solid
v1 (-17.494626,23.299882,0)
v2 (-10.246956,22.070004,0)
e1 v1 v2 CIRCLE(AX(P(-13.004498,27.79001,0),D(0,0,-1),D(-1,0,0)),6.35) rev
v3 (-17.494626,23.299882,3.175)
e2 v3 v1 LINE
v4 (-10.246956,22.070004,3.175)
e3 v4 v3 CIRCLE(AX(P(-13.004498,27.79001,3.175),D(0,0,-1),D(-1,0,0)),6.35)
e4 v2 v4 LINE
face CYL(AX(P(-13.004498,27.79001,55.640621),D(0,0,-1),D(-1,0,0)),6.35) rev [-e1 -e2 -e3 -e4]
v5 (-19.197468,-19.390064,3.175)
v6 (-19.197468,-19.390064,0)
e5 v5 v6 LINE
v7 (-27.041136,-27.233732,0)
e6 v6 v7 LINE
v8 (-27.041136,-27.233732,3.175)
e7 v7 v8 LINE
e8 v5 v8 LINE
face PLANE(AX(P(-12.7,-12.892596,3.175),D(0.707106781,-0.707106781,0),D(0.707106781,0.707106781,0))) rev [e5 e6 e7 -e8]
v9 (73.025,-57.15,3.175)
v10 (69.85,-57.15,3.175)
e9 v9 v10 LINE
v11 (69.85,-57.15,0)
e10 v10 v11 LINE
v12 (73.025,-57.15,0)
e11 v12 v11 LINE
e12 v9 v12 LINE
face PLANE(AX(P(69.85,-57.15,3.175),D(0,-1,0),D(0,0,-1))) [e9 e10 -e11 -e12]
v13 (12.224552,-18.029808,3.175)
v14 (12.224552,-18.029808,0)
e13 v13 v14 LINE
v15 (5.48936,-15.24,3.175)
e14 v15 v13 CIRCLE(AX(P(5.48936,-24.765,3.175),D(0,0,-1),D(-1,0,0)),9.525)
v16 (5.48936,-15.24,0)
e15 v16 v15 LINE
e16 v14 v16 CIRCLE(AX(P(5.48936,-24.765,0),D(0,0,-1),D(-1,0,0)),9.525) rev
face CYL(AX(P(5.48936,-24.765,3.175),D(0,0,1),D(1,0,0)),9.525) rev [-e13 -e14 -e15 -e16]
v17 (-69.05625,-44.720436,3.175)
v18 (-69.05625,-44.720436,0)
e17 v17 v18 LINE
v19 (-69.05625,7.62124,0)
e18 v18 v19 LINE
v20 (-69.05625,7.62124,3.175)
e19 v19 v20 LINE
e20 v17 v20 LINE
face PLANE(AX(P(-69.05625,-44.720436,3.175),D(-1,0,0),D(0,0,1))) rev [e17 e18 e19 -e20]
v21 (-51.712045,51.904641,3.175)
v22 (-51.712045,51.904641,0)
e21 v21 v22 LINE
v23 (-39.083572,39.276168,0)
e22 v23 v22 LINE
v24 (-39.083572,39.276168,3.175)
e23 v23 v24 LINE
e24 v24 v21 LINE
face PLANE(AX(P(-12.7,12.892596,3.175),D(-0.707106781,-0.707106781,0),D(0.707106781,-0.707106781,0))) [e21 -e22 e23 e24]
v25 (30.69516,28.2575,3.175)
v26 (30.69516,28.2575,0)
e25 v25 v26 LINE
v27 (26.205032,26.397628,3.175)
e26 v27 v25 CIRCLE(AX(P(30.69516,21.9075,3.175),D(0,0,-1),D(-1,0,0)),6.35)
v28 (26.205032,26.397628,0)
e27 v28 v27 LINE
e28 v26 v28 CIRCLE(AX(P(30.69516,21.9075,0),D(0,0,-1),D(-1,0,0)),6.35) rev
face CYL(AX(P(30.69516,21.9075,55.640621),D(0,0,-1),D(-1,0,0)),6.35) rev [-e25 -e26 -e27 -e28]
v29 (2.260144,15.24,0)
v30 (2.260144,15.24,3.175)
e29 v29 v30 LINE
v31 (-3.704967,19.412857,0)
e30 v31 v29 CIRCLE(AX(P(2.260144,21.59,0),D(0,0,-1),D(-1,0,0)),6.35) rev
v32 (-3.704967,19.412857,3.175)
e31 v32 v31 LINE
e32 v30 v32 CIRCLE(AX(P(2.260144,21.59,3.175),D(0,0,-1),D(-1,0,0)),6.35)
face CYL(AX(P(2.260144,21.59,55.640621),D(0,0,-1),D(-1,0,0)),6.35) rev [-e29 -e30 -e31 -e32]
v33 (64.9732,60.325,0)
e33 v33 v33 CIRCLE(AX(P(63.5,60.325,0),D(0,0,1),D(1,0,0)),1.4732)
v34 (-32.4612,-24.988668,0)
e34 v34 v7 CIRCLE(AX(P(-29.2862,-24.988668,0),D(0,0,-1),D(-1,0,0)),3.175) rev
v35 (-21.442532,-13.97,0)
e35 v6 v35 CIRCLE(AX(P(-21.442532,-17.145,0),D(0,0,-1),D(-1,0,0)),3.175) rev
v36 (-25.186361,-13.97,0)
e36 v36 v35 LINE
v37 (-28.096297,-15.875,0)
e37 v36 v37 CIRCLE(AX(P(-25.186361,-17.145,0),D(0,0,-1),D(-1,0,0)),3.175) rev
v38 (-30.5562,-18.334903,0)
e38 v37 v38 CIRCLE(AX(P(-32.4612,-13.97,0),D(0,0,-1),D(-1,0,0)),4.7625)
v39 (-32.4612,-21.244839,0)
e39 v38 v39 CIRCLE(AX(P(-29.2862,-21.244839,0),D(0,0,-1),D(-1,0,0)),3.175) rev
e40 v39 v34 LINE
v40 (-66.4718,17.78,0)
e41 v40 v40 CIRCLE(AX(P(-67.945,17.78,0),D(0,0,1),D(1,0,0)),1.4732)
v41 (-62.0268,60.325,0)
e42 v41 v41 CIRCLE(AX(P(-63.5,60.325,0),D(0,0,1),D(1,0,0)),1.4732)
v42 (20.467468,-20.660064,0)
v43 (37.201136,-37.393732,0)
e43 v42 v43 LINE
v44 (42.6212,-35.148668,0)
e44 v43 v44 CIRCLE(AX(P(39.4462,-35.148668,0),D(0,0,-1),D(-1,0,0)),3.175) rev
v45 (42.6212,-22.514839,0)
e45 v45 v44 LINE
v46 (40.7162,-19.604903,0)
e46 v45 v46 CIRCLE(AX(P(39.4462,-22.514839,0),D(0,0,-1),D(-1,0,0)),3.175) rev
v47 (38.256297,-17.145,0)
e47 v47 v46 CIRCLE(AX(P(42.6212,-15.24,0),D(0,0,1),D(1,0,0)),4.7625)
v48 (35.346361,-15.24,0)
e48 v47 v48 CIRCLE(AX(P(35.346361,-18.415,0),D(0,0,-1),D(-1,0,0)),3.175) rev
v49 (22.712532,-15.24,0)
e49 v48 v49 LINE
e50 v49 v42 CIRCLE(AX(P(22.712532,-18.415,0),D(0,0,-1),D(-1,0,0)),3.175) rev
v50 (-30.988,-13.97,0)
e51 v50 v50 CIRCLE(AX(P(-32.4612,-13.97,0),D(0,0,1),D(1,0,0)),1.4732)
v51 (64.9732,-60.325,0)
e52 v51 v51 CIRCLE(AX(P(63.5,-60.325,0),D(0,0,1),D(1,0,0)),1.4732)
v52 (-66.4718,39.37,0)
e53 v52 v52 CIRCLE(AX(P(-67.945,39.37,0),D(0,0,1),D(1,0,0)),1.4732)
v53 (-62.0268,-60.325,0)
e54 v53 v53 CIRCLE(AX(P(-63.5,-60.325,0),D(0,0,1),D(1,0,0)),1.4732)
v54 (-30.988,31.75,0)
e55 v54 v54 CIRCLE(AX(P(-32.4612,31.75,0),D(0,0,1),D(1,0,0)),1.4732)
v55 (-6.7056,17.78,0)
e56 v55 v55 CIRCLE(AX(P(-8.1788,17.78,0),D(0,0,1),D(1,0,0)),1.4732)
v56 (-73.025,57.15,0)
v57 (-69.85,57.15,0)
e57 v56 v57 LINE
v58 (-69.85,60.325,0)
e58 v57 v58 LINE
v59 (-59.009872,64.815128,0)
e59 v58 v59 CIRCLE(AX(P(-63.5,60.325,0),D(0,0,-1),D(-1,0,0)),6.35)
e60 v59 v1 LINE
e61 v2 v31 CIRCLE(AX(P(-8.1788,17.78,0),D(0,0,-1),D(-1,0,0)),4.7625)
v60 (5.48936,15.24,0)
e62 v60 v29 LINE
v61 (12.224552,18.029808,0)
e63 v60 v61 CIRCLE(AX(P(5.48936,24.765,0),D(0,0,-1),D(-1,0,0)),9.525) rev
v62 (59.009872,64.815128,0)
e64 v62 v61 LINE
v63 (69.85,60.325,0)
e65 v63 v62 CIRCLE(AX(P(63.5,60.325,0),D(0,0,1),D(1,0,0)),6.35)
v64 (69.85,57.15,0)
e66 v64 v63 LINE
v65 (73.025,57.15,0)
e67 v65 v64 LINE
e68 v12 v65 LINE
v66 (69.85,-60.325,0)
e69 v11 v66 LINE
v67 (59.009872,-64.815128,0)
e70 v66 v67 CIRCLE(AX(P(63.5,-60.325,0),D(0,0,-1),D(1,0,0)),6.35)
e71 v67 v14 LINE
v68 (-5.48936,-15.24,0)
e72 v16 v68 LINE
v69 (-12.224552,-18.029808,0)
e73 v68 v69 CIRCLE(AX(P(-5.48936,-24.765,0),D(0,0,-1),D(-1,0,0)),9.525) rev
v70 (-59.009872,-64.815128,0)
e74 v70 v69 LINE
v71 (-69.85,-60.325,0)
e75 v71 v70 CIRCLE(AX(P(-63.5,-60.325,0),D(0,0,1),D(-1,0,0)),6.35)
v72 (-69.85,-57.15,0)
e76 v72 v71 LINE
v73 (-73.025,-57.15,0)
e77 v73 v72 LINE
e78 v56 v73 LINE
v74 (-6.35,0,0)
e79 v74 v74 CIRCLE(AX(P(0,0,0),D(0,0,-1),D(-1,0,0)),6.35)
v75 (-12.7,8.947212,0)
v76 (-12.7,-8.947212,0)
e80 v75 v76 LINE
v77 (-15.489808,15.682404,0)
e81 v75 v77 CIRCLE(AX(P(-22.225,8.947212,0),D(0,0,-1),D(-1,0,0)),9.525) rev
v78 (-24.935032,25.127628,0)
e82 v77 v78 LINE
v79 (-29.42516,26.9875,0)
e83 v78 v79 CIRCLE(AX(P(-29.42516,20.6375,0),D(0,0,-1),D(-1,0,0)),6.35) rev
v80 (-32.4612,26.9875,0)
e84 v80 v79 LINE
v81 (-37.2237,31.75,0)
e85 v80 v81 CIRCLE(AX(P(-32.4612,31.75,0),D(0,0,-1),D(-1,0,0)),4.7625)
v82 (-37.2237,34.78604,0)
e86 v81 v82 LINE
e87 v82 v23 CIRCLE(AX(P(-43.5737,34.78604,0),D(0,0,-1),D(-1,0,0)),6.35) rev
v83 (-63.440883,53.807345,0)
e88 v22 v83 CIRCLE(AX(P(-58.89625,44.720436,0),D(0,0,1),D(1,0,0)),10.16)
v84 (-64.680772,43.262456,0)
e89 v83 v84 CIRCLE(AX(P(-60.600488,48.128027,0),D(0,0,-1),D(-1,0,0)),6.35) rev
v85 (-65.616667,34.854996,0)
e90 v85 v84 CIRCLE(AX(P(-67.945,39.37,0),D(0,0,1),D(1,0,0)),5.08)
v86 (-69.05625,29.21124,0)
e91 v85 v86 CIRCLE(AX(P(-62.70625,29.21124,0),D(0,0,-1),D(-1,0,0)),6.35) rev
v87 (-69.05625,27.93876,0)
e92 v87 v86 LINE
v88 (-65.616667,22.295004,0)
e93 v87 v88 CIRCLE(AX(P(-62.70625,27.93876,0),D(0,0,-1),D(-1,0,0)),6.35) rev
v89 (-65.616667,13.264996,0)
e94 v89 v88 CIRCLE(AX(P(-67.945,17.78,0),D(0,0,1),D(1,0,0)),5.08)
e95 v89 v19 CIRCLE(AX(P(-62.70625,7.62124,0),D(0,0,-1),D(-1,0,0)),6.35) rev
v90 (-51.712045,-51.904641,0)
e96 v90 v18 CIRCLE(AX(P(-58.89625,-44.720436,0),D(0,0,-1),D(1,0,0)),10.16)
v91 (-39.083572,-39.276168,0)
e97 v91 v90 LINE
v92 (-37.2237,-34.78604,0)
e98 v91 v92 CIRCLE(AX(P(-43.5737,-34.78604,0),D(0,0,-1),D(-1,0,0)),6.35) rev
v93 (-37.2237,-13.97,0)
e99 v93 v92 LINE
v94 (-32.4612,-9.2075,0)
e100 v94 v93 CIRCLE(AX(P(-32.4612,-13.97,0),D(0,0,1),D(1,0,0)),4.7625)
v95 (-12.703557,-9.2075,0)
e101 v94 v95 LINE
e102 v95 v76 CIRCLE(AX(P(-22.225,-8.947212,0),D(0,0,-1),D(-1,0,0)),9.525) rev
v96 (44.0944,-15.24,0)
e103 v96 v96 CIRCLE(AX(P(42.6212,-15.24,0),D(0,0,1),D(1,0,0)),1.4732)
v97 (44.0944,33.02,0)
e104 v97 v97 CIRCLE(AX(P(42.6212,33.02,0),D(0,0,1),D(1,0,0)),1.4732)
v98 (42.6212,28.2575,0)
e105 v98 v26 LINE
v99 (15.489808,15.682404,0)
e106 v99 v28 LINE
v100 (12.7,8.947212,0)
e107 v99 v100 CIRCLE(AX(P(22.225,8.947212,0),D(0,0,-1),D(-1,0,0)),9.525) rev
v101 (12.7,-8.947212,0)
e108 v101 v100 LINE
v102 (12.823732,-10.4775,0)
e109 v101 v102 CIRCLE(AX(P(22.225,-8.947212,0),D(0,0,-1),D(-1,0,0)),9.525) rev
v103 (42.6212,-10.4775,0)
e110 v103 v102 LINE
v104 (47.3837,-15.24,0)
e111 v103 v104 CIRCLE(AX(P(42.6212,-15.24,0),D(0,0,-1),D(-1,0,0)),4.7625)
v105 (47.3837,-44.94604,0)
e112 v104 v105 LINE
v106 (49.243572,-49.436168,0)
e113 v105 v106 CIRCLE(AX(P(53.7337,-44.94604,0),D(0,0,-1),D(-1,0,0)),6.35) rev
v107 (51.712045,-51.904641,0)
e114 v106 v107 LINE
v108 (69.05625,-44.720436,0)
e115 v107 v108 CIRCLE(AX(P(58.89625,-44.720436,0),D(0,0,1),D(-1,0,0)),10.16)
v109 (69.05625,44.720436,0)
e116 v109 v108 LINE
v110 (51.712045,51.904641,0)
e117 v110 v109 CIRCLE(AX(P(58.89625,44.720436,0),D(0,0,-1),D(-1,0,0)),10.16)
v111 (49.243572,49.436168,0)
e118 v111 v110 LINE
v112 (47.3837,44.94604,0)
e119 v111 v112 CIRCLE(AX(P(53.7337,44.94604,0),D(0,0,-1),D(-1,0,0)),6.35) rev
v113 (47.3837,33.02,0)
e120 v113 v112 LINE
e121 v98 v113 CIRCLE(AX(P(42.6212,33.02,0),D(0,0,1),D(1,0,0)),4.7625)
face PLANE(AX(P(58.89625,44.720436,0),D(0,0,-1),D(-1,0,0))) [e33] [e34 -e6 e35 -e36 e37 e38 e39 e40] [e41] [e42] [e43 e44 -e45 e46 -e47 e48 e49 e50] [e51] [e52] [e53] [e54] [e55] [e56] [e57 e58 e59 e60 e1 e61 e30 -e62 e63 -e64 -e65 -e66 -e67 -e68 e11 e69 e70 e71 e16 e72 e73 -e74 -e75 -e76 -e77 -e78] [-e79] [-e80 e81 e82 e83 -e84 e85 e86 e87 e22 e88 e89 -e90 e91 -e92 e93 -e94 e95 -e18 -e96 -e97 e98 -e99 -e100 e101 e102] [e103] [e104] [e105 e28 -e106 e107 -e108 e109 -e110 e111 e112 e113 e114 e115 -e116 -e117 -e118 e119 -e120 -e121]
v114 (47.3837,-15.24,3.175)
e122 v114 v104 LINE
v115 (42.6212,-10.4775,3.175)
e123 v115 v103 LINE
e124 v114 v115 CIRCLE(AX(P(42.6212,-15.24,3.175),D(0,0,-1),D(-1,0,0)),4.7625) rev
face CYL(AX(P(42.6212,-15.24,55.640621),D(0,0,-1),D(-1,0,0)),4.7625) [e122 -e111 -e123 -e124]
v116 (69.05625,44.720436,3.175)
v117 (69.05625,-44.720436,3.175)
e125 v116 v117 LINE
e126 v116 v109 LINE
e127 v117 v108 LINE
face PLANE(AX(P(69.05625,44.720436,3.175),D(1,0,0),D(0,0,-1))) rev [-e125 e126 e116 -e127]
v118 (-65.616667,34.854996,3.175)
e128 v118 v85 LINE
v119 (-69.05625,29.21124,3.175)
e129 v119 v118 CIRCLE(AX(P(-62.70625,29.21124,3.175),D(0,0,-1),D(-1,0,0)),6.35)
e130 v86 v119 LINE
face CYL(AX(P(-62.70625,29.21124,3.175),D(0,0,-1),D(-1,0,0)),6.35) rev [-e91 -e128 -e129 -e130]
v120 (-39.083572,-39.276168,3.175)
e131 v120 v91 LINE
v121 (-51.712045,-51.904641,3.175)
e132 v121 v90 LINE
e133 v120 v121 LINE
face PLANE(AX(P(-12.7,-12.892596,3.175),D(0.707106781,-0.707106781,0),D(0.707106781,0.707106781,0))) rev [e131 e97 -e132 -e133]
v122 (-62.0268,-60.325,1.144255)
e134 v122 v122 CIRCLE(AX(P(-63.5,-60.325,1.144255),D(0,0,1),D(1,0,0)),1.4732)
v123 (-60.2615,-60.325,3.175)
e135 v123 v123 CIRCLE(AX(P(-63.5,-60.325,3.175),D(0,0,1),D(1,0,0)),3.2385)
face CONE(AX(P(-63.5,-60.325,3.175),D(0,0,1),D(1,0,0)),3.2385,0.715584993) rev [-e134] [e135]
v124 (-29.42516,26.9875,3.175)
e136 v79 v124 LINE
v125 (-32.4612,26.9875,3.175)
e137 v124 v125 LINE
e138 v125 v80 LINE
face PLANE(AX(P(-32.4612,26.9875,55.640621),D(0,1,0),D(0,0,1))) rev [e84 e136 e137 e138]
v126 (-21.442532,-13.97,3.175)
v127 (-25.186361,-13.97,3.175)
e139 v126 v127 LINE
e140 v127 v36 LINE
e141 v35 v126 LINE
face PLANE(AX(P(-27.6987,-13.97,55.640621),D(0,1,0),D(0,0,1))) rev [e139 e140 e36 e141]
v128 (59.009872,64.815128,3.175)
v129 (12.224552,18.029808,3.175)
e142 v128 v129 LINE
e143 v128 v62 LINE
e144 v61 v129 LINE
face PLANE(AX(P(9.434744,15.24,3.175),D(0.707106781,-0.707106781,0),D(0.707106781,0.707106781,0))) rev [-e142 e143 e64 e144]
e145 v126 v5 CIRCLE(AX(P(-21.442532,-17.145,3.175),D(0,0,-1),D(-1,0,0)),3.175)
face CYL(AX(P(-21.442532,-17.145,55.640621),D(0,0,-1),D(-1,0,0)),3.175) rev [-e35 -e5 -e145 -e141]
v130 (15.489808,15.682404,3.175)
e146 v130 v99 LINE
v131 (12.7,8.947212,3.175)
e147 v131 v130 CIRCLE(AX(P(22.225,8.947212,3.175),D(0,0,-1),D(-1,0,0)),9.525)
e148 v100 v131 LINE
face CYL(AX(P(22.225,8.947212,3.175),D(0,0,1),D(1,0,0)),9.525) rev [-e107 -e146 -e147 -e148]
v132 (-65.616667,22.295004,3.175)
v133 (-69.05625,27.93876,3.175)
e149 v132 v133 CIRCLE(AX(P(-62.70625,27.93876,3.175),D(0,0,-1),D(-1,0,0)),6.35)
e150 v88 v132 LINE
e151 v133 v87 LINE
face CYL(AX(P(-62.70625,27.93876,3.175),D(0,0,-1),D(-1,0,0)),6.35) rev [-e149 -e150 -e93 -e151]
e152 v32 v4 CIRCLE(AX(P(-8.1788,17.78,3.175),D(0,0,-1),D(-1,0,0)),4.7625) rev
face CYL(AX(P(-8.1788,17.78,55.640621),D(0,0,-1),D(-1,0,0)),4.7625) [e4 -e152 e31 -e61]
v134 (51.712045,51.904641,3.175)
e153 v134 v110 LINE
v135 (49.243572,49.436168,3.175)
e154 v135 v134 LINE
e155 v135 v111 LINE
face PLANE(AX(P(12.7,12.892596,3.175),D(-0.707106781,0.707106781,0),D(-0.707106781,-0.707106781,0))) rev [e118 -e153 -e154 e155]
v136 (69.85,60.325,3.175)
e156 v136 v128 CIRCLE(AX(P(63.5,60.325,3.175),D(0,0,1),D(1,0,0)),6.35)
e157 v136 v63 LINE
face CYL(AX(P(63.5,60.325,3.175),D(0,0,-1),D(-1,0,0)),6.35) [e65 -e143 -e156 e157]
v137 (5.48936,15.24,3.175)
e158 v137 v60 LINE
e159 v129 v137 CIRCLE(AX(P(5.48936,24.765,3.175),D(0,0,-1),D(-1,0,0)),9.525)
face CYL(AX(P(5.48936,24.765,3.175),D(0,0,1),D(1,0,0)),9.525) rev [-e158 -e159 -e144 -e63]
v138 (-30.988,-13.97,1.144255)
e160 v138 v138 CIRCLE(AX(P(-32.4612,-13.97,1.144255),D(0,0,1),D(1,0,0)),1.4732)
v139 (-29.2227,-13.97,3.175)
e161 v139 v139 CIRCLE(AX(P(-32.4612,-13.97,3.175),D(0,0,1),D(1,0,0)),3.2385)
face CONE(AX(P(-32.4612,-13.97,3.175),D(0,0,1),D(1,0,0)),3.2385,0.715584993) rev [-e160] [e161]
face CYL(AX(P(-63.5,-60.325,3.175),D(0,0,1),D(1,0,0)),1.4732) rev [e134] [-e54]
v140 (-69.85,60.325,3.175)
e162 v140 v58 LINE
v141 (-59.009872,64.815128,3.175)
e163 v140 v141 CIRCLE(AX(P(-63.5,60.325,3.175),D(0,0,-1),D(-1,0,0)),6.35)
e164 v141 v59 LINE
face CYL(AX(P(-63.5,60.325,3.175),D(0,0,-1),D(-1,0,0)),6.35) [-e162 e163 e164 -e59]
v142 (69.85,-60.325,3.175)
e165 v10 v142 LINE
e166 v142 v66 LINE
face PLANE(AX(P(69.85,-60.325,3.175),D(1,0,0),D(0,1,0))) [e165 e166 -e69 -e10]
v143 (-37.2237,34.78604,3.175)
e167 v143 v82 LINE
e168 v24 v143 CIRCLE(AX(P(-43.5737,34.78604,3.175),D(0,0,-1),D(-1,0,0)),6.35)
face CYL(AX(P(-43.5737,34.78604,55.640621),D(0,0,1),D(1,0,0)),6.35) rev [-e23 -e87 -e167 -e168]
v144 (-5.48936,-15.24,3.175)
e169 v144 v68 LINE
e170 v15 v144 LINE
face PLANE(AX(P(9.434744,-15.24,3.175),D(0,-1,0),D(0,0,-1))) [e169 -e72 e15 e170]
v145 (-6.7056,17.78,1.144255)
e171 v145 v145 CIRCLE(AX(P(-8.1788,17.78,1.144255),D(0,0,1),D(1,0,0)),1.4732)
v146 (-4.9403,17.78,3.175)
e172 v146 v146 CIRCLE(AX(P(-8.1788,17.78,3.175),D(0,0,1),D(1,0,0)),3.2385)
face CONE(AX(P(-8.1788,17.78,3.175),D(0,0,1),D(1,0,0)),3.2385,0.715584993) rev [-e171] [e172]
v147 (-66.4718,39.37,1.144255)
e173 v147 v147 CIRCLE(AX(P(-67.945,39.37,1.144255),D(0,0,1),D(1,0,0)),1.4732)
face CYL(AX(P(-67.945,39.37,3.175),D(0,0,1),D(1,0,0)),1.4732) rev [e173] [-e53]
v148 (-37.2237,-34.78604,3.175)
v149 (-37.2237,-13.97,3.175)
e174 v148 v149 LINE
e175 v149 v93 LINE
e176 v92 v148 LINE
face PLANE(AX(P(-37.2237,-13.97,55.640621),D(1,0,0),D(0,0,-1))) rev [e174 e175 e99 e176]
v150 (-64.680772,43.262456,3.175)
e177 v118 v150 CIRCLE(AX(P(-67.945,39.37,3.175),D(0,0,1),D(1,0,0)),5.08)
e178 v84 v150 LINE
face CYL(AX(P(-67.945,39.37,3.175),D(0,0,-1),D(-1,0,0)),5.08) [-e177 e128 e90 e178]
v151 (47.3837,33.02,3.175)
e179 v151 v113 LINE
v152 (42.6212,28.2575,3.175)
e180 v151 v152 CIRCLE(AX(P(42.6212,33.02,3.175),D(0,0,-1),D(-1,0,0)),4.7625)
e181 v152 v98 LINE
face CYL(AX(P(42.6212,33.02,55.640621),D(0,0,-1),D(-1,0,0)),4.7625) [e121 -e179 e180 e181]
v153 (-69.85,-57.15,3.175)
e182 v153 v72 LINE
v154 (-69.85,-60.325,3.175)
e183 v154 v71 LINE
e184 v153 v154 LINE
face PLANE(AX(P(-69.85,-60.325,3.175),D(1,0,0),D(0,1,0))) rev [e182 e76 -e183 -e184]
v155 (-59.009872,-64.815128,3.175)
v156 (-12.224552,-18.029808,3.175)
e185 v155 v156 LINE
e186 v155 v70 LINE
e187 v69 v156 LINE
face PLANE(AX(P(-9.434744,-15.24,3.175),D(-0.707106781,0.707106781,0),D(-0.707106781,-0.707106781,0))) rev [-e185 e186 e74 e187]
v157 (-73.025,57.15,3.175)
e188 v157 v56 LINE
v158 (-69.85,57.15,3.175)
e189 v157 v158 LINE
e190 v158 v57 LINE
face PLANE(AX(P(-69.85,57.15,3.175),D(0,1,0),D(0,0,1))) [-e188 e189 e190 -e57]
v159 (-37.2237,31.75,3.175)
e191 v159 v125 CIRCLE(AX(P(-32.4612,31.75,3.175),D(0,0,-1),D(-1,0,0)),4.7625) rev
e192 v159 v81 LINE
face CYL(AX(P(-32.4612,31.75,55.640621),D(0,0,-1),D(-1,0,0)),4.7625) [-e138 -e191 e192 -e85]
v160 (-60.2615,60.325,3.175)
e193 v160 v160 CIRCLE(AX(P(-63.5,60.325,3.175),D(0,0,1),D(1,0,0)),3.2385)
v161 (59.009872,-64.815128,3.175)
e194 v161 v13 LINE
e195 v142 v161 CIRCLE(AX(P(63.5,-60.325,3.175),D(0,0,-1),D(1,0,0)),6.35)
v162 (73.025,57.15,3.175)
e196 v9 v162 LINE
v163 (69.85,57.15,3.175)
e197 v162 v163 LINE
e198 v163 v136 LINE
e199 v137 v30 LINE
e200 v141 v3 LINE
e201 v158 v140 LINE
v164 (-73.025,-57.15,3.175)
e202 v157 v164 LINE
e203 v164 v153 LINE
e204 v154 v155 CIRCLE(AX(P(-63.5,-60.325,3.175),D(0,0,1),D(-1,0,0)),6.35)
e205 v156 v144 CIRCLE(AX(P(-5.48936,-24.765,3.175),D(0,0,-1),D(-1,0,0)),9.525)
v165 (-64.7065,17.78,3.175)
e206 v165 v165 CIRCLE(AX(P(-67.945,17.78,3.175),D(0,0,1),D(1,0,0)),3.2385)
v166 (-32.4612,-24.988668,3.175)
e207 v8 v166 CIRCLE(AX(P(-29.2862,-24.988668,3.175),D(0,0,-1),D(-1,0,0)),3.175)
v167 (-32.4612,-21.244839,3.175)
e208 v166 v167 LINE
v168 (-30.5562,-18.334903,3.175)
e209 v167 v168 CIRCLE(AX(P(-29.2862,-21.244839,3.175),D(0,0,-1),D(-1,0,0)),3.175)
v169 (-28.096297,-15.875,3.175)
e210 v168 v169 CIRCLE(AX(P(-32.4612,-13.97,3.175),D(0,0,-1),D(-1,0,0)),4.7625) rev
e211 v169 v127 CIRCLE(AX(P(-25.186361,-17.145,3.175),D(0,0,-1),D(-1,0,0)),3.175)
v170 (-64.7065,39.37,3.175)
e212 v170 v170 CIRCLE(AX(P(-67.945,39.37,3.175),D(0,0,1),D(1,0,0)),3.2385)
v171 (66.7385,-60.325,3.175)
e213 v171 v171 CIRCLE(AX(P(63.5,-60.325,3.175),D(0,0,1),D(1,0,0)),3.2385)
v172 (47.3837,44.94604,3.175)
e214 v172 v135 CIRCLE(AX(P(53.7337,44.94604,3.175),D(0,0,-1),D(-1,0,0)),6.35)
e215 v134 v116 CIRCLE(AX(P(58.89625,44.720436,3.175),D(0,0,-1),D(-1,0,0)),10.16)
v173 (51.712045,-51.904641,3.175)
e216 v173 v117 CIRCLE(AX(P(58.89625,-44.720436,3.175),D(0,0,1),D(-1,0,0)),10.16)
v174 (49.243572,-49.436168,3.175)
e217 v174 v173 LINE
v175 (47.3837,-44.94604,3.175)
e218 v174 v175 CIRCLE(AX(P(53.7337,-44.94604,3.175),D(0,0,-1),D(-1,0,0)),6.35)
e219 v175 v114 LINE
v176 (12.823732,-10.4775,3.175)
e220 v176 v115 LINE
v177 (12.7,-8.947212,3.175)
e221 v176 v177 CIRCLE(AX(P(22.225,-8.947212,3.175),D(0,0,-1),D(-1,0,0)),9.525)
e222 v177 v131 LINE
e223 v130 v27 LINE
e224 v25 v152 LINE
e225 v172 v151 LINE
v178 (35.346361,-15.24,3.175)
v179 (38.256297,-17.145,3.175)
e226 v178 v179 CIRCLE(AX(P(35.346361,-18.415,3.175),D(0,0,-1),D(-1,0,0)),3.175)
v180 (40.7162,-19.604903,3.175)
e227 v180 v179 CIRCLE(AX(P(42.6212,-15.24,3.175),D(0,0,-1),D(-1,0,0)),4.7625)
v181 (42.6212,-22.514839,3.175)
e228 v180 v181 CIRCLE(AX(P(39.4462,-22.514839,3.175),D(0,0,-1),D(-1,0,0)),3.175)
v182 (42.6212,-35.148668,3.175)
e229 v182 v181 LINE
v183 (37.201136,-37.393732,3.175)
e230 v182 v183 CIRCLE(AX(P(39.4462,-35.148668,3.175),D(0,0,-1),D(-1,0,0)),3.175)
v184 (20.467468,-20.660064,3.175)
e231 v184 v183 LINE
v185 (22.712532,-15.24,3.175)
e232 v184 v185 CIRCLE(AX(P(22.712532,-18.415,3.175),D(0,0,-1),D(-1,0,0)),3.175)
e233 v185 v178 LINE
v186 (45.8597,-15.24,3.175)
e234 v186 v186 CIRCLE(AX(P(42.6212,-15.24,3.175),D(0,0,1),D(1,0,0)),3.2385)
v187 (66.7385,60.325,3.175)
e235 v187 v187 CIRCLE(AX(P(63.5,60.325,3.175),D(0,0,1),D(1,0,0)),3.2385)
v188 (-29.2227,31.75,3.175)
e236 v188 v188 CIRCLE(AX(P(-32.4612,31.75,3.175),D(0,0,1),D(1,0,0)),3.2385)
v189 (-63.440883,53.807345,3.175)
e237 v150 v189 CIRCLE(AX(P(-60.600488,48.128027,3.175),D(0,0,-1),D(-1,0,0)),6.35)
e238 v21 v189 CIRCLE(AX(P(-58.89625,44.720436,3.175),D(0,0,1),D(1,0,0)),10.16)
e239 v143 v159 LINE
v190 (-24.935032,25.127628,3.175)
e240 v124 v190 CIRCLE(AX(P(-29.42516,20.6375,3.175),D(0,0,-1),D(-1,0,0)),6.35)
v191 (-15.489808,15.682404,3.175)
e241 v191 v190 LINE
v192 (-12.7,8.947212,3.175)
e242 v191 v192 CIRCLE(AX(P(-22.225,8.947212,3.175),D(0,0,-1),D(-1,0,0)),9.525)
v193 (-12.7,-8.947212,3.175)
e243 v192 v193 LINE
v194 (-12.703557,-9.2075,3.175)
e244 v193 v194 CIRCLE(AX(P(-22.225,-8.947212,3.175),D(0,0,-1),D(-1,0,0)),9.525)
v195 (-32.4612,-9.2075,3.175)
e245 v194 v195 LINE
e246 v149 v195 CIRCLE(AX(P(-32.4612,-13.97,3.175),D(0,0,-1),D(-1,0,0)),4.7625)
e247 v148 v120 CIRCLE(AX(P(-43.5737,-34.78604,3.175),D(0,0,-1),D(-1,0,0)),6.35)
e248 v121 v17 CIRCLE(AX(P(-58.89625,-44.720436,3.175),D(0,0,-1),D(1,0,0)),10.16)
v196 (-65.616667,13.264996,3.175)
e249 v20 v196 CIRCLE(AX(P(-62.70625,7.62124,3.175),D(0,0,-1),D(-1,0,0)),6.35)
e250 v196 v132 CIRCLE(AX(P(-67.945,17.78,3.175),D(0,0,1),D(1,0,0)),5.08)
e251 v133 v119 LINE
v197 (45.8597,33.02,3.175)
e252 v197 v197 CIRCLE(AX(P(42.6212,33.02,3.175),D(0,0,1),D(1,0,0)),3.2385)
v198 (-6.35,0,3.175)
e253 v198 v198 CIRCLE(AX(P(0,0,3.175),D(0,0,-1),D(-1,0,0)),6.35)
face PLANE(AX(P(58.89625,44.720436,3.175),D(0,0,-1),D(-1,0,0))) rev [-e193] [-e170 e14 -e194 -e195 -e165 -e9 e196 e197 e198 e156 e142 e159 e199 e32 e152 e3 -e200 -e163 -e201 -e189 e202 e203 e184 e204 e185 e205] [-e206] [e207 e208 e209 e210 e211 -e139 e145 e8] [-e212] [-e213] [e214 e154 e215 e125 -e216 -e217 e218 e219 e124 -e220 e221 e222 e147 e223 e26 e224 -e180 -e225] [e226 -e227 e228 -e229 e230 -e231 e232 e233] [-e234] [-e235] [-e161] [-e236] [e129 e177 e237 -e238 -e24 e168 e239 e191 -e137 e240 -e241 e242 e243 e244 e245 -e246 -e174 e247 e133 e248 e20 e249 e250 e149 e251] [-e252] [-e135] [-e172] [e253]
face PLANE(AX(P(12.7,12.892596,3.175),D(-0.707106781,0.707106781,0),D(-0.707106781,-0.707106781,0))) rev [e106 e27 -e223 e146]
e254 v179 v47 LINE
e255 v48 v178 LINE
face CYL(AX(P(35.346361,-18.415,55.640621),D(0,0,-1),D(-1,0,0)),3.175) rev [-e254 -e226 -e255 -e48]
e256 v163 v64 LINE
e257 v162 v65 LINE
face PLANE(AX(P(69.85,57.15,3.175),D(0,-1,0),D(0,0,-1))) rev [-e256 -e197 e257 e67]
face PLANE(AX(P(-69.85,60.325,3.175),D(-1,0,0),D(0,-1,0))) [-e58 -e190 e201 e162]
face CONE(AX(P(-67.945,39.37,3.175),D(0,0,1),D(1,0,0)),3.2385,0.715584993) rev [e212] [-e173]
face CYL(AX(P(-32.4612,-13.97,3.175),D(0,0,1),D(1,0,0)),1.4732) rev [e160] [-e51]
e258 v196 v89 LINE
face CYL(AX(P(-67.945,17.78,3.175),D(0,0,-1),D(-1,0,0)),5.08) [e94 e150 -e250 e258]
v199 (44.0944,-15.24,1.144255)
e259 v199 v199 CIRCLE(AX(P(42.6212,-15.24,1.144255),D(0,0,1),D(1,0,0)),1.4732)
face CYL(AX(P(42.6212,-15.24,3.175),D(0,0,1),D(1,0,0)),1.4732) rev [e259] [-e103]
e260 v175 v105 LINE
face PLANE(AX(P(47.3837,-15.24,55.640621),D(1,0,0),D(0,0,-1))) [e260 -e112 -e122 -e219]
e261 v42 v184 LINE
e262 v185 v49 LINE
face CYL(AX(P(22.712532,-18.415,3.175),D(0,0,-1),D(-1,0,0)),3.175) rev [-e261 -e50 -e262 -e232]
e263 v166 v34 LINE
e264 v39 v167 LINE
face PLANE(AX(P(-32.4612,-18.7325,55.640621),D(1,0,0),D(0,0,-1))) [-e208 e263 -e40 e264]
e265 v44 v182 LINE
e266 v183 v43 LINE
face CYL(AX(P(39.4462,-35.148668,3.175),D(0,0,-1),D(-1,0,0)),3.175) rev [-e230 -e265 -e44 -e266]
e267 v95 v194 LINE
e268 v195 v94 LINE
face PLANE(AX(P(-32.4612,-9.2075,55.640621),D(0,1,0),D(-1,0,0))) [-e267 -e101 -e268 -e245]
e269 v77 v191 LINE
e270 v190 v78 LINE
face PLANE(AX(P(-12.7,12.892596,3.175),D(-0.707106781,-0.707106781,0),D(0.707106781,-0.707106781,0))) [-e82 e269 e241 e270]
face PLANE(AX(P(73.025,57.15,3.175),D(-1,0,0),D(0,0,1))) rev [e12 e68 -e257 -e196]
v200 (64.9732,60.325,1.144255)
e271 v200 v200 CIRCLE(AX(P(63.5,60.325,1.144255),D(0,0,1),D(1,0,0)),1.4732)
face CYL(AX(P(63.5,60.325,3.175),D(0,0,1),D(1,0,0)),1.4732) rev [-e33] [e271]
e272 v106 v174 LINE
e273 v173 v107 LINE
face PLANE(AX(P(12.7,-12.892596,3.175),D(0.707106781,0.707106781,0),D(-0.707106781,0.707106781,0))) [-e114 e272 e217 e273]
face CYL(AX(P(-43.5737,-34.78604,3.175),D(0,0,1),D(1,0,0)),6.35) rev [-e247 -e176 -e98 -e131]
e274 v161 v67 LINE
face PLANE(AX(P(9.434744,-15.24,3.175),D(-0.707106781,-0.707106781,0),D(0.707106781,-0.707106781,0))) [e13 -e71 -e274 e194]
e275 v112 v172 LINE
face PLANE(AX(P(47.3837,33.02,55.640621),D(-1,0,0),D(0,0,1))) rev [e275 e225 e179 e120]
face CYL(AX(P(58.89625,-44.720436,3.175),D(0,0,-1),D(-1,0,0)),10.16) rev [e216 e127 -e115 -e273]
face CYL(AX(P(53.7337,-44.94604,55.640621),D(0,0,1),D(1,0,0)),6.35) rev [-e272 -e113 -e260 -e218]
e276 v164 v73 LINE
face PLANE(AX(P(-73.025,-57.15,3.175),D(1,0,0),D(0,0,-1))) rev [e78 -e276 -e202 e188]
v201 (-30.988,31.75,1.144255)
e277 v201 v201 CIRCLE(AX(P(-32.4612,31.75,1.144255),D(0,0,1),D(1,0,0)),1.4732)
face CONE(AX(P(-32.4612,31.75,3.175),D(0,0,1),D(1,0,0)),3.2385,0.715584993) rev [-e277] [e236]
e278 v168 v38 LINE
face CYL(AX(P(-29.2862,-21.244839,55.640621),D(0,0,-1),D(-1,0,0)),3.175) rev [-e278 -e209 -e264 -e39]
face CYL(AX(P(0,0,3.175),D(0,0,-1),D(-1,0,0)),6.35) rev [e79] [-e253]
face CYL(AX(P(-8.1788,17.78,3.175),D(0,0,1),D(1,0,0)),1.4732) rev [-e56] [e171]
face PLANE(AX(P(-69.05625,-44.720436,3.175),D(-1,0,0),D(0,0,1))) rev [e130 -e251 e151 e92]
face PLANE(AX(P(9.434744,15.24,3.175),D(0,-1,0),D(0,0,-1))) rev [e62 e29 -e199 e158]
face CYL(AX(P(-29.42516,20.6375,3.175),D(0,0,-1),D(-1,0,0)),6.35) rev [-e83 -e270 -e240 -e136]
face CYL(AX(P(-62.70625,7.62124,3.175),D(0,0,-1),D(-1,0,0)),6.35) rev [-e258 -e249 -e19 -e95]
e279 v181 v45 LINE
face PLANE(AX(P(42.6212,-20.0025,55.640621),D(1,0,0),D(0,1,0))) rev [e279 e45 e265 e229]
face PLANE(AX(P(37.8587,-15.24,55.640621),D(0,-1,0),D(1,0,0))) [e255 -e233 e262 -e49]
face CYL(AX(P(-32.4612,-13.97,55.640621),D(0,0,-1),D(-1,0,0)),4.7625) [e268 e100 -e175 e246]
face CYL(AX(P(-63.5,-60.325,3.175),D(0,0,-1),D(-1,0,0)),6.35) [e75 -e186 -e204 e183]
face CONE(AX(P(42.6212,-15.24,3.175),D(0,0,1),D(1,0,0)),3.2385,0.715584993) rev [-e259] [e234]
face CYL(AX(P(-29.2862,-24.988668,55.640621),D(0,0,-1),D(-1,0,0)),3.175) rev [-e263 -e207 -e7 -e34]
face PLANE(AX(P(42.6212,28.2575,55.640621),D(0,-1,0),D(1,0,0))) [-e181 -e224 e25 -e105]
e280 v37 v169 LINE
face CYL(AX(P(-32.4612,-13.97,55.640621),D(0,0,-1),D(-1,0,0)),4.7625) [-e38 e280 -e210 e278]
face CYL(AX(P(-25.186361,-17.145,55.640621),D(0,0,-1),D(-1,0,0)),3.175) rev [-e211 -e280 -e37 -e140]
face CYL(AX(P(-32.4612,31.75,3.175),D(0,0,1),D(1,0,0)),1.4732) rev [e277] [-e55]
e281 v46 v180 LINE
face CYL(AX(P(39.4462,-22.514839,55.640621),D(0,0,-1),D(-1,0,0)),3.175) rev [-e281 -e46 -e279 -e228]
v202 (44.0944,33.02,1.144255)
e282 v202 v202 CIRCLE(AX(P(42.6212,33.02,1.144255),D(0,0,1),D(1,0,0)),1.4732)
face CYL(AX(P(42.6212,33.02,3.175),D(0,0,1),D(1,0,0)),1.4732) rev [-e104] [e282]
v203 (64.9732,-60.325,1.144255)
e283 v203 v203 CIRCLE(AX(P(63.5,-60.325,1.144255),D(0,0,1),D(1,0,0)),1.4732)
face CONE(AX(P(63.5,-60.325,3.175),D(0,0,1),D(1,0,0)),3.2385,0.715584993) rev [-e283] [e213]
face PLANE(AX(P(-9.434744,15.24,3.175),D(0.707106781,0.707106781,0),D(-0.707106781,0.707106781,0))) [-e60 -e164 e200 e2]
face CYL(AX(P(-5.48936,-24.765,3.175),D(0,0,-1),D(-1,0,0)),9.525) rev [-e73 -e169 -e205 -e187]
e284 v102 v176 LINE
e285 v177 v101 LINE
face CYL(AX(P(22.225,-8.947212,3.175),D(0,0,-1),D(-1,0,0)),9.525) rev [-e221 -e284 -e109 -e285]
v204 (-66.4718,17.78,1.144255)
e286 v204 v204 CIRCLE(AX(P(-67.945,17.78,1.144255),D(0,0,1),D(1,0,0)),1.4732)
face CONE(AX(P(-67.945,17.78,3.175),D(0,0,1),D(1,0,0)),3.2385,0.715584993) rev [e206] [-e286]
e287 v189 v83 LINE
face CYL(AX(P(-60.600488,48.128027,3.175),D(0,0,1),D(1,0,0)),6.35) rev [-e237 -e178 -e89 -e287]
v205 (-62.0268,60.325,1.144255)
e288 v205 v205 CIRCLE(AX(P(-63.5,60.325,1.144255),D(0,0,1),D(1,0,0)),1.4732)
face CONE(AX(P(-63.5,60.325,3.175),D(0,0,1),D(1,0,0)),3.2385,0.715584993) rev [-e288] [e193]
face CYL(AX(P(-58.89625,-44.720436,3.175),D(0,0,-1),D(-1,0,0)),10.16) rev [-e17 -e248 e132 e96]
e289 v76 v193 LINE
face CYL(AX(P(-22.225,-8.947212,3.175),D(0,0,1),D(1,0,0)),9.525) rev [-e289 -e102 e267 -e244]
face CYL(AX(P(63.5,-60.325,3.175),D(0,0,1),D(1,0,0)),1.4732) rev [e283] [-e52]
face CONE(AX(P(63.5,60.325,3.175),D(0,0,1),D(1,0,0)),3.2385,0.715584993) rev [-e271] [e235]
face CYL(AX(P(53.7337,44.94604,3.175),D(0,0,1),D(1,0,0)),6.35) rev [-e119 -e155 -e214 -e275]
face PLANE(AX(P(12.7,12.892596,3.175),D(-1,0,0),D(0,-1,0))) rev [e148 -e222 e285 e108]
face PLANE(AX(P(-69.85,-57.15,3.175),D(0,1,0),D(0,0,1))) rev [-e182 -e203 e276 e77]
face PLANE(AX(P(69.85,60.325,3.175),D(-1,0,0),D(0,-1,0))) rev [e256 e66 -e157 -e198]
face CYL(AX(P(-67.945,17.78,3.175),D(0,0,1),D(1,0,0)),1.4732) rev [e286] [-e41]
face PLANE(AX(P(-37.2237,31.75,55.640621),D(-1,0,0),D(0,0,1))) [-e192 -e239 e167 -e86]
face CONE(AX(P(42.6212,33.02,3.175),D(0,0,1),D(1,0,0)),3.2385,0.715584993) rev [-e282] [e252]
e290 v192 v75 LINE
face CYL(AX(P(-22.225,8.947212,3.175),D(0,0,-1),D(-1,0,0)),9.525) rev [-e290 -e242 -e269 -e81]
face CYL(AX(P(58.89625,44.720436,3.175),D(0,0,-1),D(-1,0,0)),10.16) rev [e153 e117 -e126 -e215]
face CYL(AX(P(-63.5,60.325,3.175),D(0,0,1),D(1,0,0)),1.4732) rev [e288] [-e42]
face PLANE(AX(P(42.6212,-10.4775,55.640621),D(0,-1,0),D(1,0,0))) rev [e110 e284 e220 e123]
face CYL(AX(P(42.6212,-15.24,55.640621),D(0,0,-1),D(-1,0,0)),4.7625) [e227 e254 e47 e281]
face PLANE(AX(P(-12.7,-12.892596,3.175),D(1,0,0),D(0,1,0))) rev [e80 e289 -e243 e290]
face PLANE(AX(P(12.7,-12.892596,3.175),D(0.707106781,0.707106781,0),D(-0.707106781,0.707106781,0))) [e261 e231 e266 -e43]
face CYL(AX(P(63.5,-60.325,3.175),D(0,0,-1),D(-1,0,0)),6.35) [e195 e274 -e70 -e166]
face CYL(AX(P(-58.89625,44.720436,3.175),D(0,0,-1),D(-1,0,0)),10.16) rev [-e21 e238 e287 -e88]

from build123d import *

# Parameters (mm, degrees)
BOSS_EXTRUDE1_DEPTH           = 3.175
MIRROR2_COPY_1_DEPTH          = 3.175
INTERNAL_SHARPS_R             = 9.525
IMU_MOUNTING_DEPTH            = 3.175
IMU_MOUNTING_HOLES_AT_2_COUNT = 2
IMU_MOUNTING_HOLES_AT_2_PITCH = 21.59
IMU_TOOLING_RADIUS_R          = 6.35
SKETCH18_R                    = 4.7625
MCU_MOUNTING_RIBS_DEPTH       = 3.175
TOOLING_RADIUS_R              = 6.35
TOOLING_RADIUS_SMALL_R        = 3.175
SKETCH6_R                     = 6.35
MATERIAL_REMOVAL_DEPTH        = 99.935771608
MCU_MOUNTING_HOLES_AT_2_COUNT = 2
MCU_MOUNTING_HOLES_AT_2_PITCH = 45.72
MCU_MOUNTING_HOLES_AT_3_COUNT = 2
MCU_MOUNTING_HOLES_AT_3_PITCH = 88.57441442
MCU_MOUNTING_HOLES_AT_4_COUNT = 2
MCU_MOUNTING_HOLES_AT_4_PITCH = 75.093140098
MCU_MOUNTING_HOLES_AT_5_COUNT = 2
MCU_MOUNTING_HOLES_AT_5_PITCH = 39.97120776


with BuildPart() as part:
    # Sketch1 → Boss-Extrude1 (new body)
    with BuildSketch(Plane.XY):
        with BuildLine():
            Line((9.434743879, 15.24), (0, 15.24))
            Line((0, 15.24), (0, 0))
            Line((0, 0), (12.7, 0))
            Line((12.7, 0), (12.7, 12.892596045))
            Line((12.7, 12.892596045), (51.712045103, 51.904641149))
            ThreePointArc((51.712045103, 51.904641149), (62.784313673, 54.107052302), (69.05625, 44.720436252))
            Line((69.05625, 44.720436252), (69.05625, 0))
            Line((69.05625, 0), (73.025, 0))
            Line((73.025, 0), (73.025, 57.15))
            Line((73.025, 57.15), (69.85, 57.15))
            Line((69.85, 57.15), (69.85, 60.325))
            ThreePointArc((69.85, 60.325), (65.930039796, 66.191635031), (59.009871939, 64.815128061))
            Line((59.009871939, 64.815128061), (9.434743879, 15.24))
        make_face()
    boss_extrude1 = extrude(amount=BOSS_EXTRUDE1_DEPTH)

    # Sketch11 → CSK for #4 Flat Head Machine Screw1 (revolve, cut)
    with BuildSketch(Plane(origin=(63.5, 60.325, 3.175), x_dir=(0, -1, 0), z_dir=(1, 0, 0))):
        Polygon((0, 0), (0, 3.175), (1.4732, 3.175), (1.4732, 2.030745349), (3.2385, 0), align=None)
    csk_for_4_flat_head_machine_screw1 = revolve(axis=Axis((63.5, 60.325, 9.525), (0, 0, -1)), mode=Mode.SUBTRACT)

    # Mirror1: Boss-Extrude1, CSK for #4 Flat Head Machine Screw1 across plane
    add(boss_extrude1.mirror(Plane.ZX))
    add(csk_for_4_flat_head_machine_screw1.mirror(Plane.ZX), mode=Mode.SUBTRACT)

    # Mirror2: Boss-Extrude1, CSK for #4 Flat Head Machine Screw1 across plane
    add(boss_extrude1.mirror(Plane(origin=(0, 0, 0), x_dir=(0, 0, 1), z_dir=(1, 0, 0))))
    add(csk_for_4_flat_head_machine_screw1.mirror(Plane(origin=(0, 0, 0), x_dir=(0, 0, 1), z_dir=(1, 0, 0))), mode=Mode.SUBTRACT)

    # Mirror2 copy 1 sketch → Mirror2 copy 1 (add)
    with BuildSketch(Plane(origin=(0, 0, 0), x_dir=(-1, 0, 0), z_dir=(0, 0, 1))):
        with BuildLine():
            Line((9.434743879, 15.24), (0, 15.24))
            Line((0, 15.24), (0, 0))
            Line((0, 0), (12.7, 0))
            Line((12.7, 0), (12.7, 12.892596045))
            Line((12.7, 12.892596045), (51.712045103, 51.904641149))
            ThreePointArc((51.712045103, 51.904641149), (62.784313673, 54.107052302), (69.05625, 44.720436252))
            Line((69.05625, 44.720436252), (69.05625, 0))
            Line((69.05625, 0), (73.025, 0))
            Line((73.025, 0), (73.025, 57.15))
            Line((73.025, 57.15), (69.85, 57.15))
            Line((69.85, 57.15), (69.85, 60.325))
            ThreePointArc((69.85, 60.325), (65.930039796, 66.191635031), (59.009871939, 64.815128061))
            Line((59.009871939, 64.815128061), (9.434743879, 15.24))
        make_face()
    extrude(amount=MIRROR2_COPY_1_DEPTH)

    # Mirror2 copy 2 sketch → Mirror2 copy 2 (revolve, cut)
    with BuildSketch(Plane(origin=(-63.5, -60.325, 3.175), x_dir=(0, 1, 0), z_dir=(-1, 0, 0))):
        Polygon((0, 0), (0, 3.175), (1.4732, 3.175), (1.4732, 2.030745349), (3.2385, 0), align=None)
    revolve(axis=Axis((-63.5, -60.325, 9.525), (0, 0, -1)), mode=Mode.SUBTRACT)

    # INTERNAL-SHARPS
    internal_sharps_edges = [part.edges().sort_by_distance(p)[0] for p in [
        (-9.434743879, 15.24, 1.5875),
        (-12.7, 12.892596045, 1.5875),
        (9.434743879, 15.24, 1.5875),
        (12.7, 12.892596045, 1.5875),
        (9.434743879, -15.24, 1.5875),
        (12.7, -12.892596045, 1.5875),
        (-12.7, -12.892596045, 1.5875),
        (-9.434743879, -15.24, 1.5875),
    ]]
    fillet(internal_sharps_edges, radius=INTERNAL_SHARPS_R)

    # Sketch13 → IMU-MOUNTING (add)
    with BuildSketch(Plane.XY):
        with BuildLine():
            Line((-73.025, 44.45), (-73.025, 12.7))
            Line((-73.025, 12.7), (-67.945, 12.7))
            ThreePointArc((-67.945, 12.7), (-62.895851895, 18.339020045), (-69.05625, 22.736967161))
            Line((-69.05625, 22.736967161), (-69.05625, 34.413032839))
            ThreePointArc((-69.05625, 34.413032839), (-62.895851895, 38.810979955), (-67.945, 44.45))
            Line((-67.945, 44.45), (-73.025, 44.45))
        make_face()
    extrude(amount=IMU_MOUNTING_DEPTH)

    # Sketch15 → IMU-MOUNTING-HOLES (revolve, cut)
    with BuildSketch(Plane(origin=(-67.945, 17.78, 3.175), x_dir=(0, -1, 0), z_dir=(1, 0, 0))):
        Polygon((0, 0), (0, 3.175), (1.4732, 3.175), (1.4732, 2.030745349), (3.2385, 0), align=None)
    imu_mounting_holes = revolve(axis=Axis((-67.945, 17.78, 9.525), (0, 0, -1)), mode=Mode.SUBTRACT)

    # IMU-MOUNTING-HOLES at 2: IMU-MOUNTING-HOLES ×2
    with Locations(*[(0, i * IMU_MOUNTING_HOLES_AT_2_PITCH, 0) for i in range(1, IMU_MOUNTING_HOLES_AT_2_COUNT)]):
        add(imu_mounting_holes, mode=Mode.SUBTRACT)

    # IMU-TOOLING-RADIUS
    imu_tooling_radius_edges = [part.edges().sort_by_distance(p)[0] for p in [
        (-69.05625, 44.45, 1.5875),
        (-69.05625, 12.7, 1.5875),
        (-69.05625, 22.736967161, 1.5875),
        (-69.05625, 34.413032839, 1.5875),
    ]]
    fillet(imu_tooling_radius_edges, radius=IMU_TOOLING_RADIUS_R)

    # Sketch18 → MCU-MOUNTING-RIBS (add)
    with BuildSketch(Plane(origin=(0, 0, 0), x_dir=(-1, 0, 0), z_dir=(0, 0, -1))):
        with Locations((8.1788, 17.78)):
            Circle(SKETCH18_R)
        with BuildLine():
            Line((32.4612, -32.653796045), (37.2237, -37.416296045))
            Line((37.2237, -37.416296045), (37.2237, -13.97))
            ThreePointArc((37.2237, -13.97), (35.828796045, -10.602403955), (32.4612, -9.2075))
            Line((32.4612, -9.2075), (9.014903955, -9.2075))
            Line((9.014903955, -9.2075), (13.777403955, -13.97))
            Line((13.777403955, -13.97), (27.6987, -13.97))
            ThreePointArc((27.6987, -13.97), (29.093603955, -17.337596045), (32.4612, -18.7325))
            Line((32.4612, -18.7325), (32.4612, -32.653796045))
        make_face()
        with BuildLine():
            Line((32.4612, 26.9875), (26.794903955, 26.9875))
            Line((26.794903955, 26.9875), (37.2237, 37.416296045))
            Line((37.2237, 37.416296045), (37.2237, 31.75))
            ThreePointArc((37.2237, 31.75), (35.828796045, 28.382403955), (32.4612, 26.9875))
        make_face()
        with BuildLine():
            Line((-42.6212, -10.4775), (-10.284903955, -10.4775))
            Line((-10.284903955, -10.4775), (-15.047403955, -15.24))
            Line((-15.047403955, -15.24), (-37.8587, -15.24))
            ThreePointArc((-37.8587, -15.24), (-39.253603955, -18.607596045), (-42.6212, -20.0025))
            Line((-42.6212, -20.0025), (-42.6212, -42.813796045))
            Line((-42.6212, -42.813796045), (-47.3837, -47.576296045))
            Line((-47.3837, -47.576296045), (-47.3837, -15.24))
            ThreePointArc((-47.3837, -15.24), (-45.988796045, -11.872403955), (-42.6212, -10.4775))
        make_face()
        with BuildLine():
            Line((-42.6212, 28.2575), (-28.064903955, 28.2575))
            Line((-28.064903955, 28.2575), (-47.3837, 47.576296045))
            Line((-47.3837, 47.576296045), (-47.3837, 33.02))
            ThreePointArc((-47.3837, 33.02), (-45.988796045, 29.652403955), (-42.6212, 28.2575))
        make_face()
    extrude(amount=-MCU_MOUNTING_RIBS_DEPTH)

    # TOOLING-RADIUS
    tooling_radius_edges = [part.edges().sort_by_distance(p)[0] for p in [
        (-37.2237, -37.416296045, 1.5875),
        (47.3837, -47.576296045, 1.5875),
        (-26.794903955, 26.9875, 1.5875),
        (-37.2237, 37.416296045, 1.5875),
        (28.064903955, 28.2575, 1.5875),
        (47.3837, 47.576296045, 1.5875),
        (-12.858570933, 18.663827054, 1.5875),
        (-4.150176631, 15.24, 1.5875),
    ]]
    fillet(tooling_radius_edges, radius=TOOLING_RADIUS_R)

    # TOOLING-RADIUS-SMALL
    # the kernel refuses this fillet: 3.175 mm, written as the material it adds along each edge
    with BuildSketch(Plane(origin=(42.6212, -20.0025, 0), x_dir=(-0.9789063129307034, 0.2043096436892193, 0), z_dir=(0, 0, 1)), Plane(origin=(-27.6987, -13.97, 0), x_dir=(-0.2043096436892193, -0.9789063129307034, 0), z_dir=(0, 0, 1))) as tooling_radius_small_piece_1:
        with BuildLine():
            CenterArc((2.594732475, 3.108027544), TOOLING_RADIUS_SMALL_R, 191.789089239, 66.421821522)
            Line((-0.513295069, 2.459344425), (0, 0))
            ThreePointArc((0, 0), (0.973024678, 0.100458685), (1.946049356, 0))
        make_face()
    extrude(amount=3.175)
    with BuildSketch(Plane(origin=(37.8587, -15.24, 0), x_dir=(-1, 0, 0), z_dir=(0, 0, 1)), Plane(origin=(-32.4612, -18.7325, 0), x_dir=(0, -1, 0), z_dir=(0, 0, 1))) as tooling_radius_small_piece_2:
        with BuildLine():
            CenterArc((2.512338916, 3.175), TOOLING_RADIUS_SMALL_R, 203.578178478, 66.421821522)
            ThreePointArc((-0.397596651, 1.905), (-0.100458685, 0.973024678), (0, 0))
            Line((0, 0), (2.512338916, 0))
        make_face()
    extrude(amount=3.175)
    with BuildSketch(Plane(origin=(42.6212, -42.813796045, 0), x_dir=(0, 1, 0), z_dir=(0, 0, 1))) as tooling_radius_small_piece_3:
        with BuildLine():
            CenterArc((TOOLING_RADIUS_SMALL_R * 2.41421356237, TOOLING_RADIUS_SMALL_R), TOOLING_RADIUS_SMALL_R, 135, 135)
            Line((TOOLING_RADIUS_SMALL_R * 1.70710678119, TOOLING_RADIUS_SMALL_R * 1.70710678119), (0, 0))
            Line((0, 0), (TOOLING_RADIUS_SMALL_R * 2.41421356237, 0))
        make_face()
    extrude(amount=3.175)
    with BuildSketch(Plane(origin=(-32.4612, -32.653796045, 0), x_dir=(0, 1, 0), z_dir=(0, 0, 1))) as tooling_radius_small_piece_4:
        with BuildLine():
            CenterArc((TOOLING_RADIUS_SMALL_R * 2.41421356237, -TOOLING_RADIUS_SMALL_R), TOOLING_RADIUS_SMALL_R, 90, 135)
            Line((TOOLING_RADIUS_SMALL_R * 1.70710678119, -TOOLING_RADIUS_SMALL_R * 1.70710678119), (0, 0))
            Line((0, 0), (TOOLING_RADIUS_SMALL_R * 2.41421356237, 0))
        make_face()
    extrude(amount=3.175)
    with BuildSketch(Plane(origin=(-14.131964455, -13.97, 0), x_dir=(-1, 0, 0), z_dir=(0, 0, 1))) as tooling_radius_small_piece_5:
        with BuildLine():
            CenterArc((7.310567561, 3.175), TOOLING_RADIUS_SMALL_R, 135, 135)
            Line((5.06550353, 5.42006403), (4.840997127, 5.644570433))
            ThreePointArc((4.840997127, 5.644570433), (1.133337052, 1.936910358), (-0.269767852, 0.167426271))
            Line((-0.269767852, 0.167426271), (0, -0.3175))
            Line((0, -0.3175), (7.310567561, -0.3175))
            Line((7.310567561, -0.3175), (7.310567561, 0))
        make_face()
    extrude(amount=3.175)
    with BuildSketch(Plane(origin=(15.074724308, -15.24, 0), x_dir=(0.7053179071572191, -0.7088911410388483, 0), z_dir=(0, 0, 1))) as tooling_radius_small_piece_6:
        with BuildLine():
            CenterArc((7.63781192, 3.174989865), TOOLING_RADIUS_SMALL_R, 135.144766988, 135)
            Line((5.387082547, 5.414374221), (5.16200961, 5.638312656))
            Line((5.16200961, 5.638312656), (-0.225072937, 0.223938436))
            Line((-0.225072937, 0.223938436), (-0.019410524, -0.316906108))
            ThreePointArc((-0.019410524, -0.316906108), (0.607184355, -0.33528533), (7.646636273, -0.317498987))
            Line((7.646636273, -0.317498987), (7.645834059, 0))
        make_face()
    extrude(amount=3.175)

    # Sketch6 → MATERIAL-REMOVAL (cut, through all)
    with BuildSketch(Plane(origin=(0, 0, 0), x_dir=(-1, 0, 0), z_dir=(0, 0, -1))):
        Circle(SKETCH6_R)
    extrude(amount=-MATERIAL_REMOVAL_DEPTH, mode=Mode.SUBTRACT)

    # Sketch20 → MCU-MOUNTING-HOLES (revolve, cut)
    with BuildSketch(Plane(origin=(-32.4612, -13.97, 3.175), x_dir=(0, -1, 0), z_dir=(1, 0, 0))):
        Polygon((0, 0), (0, 3.175), (1.4732, 3.175), (1.4732, 2.030745349), (3.2385, 0), align=None)
    mcu_mounting_holes = revolve(axis=Axis((-32.4612, -13.97, 9.525), (0, 0, -1)), mode=Mode.SUBTRACT)

    # MCU-MOUNTING-HOLES at 2: MCU-MOUNTING-HOLES ×2
    with Locations(*[(0, i * MCU_MOUNTING_HOLES_AT_2_PITCH, 0) for i in range(1, MCU_MOUNTING_HOLES_AT_2_COUNT)]):
        add(mcu_mounting_holes, mode=Mode.SUBTRACT)

    # MCU-MOUNTING-HOLES at 3: MCU-MOUNTING-HOLES ×2
    with Locations(*[Vector(0.8476759399659948, 0.5305143737946855, 0) * (i * MCU_MOUNTING_HOLES_AT_3_PITCH) for i in range(1, MCU_MOUNTING_HOLES_AT_3_COUNT)]):
        add(mcu_mounting_holes, mode=Mode.SUBTRACT)

    # MCU-MOUNTING-HOLES at 4: MCU-MOUNTING-HOLES ×2
    with Locations(*[Vector(0.9998569763114565, -0.016912330451817784, 0) * (i * MCU_MOUNTING_HOLES_AT_4_PITCH) for i in range(1, MCU_MOUNTING_HOLES_AT_4_COUNT)]):
        add(mcu_mounting_holes, mode=Mode.SUBTRACT)

    # MCU-MOUNTING-HOLES at 5: MCU-MOUNTING-HOLES ×2
    with Locations(*[Vector(0.6074972801935523, 0.7943217575752515, 0) * (i * MCU_MOUNTING_HOLES_AT_5_PITCH) for i in range(1, MCU_MOUNTING_HOLES_AT_5_COUNT)]):
        add(mcu_mounting_holes, mode=Mode.SUBTRACT)


solid = part.part
